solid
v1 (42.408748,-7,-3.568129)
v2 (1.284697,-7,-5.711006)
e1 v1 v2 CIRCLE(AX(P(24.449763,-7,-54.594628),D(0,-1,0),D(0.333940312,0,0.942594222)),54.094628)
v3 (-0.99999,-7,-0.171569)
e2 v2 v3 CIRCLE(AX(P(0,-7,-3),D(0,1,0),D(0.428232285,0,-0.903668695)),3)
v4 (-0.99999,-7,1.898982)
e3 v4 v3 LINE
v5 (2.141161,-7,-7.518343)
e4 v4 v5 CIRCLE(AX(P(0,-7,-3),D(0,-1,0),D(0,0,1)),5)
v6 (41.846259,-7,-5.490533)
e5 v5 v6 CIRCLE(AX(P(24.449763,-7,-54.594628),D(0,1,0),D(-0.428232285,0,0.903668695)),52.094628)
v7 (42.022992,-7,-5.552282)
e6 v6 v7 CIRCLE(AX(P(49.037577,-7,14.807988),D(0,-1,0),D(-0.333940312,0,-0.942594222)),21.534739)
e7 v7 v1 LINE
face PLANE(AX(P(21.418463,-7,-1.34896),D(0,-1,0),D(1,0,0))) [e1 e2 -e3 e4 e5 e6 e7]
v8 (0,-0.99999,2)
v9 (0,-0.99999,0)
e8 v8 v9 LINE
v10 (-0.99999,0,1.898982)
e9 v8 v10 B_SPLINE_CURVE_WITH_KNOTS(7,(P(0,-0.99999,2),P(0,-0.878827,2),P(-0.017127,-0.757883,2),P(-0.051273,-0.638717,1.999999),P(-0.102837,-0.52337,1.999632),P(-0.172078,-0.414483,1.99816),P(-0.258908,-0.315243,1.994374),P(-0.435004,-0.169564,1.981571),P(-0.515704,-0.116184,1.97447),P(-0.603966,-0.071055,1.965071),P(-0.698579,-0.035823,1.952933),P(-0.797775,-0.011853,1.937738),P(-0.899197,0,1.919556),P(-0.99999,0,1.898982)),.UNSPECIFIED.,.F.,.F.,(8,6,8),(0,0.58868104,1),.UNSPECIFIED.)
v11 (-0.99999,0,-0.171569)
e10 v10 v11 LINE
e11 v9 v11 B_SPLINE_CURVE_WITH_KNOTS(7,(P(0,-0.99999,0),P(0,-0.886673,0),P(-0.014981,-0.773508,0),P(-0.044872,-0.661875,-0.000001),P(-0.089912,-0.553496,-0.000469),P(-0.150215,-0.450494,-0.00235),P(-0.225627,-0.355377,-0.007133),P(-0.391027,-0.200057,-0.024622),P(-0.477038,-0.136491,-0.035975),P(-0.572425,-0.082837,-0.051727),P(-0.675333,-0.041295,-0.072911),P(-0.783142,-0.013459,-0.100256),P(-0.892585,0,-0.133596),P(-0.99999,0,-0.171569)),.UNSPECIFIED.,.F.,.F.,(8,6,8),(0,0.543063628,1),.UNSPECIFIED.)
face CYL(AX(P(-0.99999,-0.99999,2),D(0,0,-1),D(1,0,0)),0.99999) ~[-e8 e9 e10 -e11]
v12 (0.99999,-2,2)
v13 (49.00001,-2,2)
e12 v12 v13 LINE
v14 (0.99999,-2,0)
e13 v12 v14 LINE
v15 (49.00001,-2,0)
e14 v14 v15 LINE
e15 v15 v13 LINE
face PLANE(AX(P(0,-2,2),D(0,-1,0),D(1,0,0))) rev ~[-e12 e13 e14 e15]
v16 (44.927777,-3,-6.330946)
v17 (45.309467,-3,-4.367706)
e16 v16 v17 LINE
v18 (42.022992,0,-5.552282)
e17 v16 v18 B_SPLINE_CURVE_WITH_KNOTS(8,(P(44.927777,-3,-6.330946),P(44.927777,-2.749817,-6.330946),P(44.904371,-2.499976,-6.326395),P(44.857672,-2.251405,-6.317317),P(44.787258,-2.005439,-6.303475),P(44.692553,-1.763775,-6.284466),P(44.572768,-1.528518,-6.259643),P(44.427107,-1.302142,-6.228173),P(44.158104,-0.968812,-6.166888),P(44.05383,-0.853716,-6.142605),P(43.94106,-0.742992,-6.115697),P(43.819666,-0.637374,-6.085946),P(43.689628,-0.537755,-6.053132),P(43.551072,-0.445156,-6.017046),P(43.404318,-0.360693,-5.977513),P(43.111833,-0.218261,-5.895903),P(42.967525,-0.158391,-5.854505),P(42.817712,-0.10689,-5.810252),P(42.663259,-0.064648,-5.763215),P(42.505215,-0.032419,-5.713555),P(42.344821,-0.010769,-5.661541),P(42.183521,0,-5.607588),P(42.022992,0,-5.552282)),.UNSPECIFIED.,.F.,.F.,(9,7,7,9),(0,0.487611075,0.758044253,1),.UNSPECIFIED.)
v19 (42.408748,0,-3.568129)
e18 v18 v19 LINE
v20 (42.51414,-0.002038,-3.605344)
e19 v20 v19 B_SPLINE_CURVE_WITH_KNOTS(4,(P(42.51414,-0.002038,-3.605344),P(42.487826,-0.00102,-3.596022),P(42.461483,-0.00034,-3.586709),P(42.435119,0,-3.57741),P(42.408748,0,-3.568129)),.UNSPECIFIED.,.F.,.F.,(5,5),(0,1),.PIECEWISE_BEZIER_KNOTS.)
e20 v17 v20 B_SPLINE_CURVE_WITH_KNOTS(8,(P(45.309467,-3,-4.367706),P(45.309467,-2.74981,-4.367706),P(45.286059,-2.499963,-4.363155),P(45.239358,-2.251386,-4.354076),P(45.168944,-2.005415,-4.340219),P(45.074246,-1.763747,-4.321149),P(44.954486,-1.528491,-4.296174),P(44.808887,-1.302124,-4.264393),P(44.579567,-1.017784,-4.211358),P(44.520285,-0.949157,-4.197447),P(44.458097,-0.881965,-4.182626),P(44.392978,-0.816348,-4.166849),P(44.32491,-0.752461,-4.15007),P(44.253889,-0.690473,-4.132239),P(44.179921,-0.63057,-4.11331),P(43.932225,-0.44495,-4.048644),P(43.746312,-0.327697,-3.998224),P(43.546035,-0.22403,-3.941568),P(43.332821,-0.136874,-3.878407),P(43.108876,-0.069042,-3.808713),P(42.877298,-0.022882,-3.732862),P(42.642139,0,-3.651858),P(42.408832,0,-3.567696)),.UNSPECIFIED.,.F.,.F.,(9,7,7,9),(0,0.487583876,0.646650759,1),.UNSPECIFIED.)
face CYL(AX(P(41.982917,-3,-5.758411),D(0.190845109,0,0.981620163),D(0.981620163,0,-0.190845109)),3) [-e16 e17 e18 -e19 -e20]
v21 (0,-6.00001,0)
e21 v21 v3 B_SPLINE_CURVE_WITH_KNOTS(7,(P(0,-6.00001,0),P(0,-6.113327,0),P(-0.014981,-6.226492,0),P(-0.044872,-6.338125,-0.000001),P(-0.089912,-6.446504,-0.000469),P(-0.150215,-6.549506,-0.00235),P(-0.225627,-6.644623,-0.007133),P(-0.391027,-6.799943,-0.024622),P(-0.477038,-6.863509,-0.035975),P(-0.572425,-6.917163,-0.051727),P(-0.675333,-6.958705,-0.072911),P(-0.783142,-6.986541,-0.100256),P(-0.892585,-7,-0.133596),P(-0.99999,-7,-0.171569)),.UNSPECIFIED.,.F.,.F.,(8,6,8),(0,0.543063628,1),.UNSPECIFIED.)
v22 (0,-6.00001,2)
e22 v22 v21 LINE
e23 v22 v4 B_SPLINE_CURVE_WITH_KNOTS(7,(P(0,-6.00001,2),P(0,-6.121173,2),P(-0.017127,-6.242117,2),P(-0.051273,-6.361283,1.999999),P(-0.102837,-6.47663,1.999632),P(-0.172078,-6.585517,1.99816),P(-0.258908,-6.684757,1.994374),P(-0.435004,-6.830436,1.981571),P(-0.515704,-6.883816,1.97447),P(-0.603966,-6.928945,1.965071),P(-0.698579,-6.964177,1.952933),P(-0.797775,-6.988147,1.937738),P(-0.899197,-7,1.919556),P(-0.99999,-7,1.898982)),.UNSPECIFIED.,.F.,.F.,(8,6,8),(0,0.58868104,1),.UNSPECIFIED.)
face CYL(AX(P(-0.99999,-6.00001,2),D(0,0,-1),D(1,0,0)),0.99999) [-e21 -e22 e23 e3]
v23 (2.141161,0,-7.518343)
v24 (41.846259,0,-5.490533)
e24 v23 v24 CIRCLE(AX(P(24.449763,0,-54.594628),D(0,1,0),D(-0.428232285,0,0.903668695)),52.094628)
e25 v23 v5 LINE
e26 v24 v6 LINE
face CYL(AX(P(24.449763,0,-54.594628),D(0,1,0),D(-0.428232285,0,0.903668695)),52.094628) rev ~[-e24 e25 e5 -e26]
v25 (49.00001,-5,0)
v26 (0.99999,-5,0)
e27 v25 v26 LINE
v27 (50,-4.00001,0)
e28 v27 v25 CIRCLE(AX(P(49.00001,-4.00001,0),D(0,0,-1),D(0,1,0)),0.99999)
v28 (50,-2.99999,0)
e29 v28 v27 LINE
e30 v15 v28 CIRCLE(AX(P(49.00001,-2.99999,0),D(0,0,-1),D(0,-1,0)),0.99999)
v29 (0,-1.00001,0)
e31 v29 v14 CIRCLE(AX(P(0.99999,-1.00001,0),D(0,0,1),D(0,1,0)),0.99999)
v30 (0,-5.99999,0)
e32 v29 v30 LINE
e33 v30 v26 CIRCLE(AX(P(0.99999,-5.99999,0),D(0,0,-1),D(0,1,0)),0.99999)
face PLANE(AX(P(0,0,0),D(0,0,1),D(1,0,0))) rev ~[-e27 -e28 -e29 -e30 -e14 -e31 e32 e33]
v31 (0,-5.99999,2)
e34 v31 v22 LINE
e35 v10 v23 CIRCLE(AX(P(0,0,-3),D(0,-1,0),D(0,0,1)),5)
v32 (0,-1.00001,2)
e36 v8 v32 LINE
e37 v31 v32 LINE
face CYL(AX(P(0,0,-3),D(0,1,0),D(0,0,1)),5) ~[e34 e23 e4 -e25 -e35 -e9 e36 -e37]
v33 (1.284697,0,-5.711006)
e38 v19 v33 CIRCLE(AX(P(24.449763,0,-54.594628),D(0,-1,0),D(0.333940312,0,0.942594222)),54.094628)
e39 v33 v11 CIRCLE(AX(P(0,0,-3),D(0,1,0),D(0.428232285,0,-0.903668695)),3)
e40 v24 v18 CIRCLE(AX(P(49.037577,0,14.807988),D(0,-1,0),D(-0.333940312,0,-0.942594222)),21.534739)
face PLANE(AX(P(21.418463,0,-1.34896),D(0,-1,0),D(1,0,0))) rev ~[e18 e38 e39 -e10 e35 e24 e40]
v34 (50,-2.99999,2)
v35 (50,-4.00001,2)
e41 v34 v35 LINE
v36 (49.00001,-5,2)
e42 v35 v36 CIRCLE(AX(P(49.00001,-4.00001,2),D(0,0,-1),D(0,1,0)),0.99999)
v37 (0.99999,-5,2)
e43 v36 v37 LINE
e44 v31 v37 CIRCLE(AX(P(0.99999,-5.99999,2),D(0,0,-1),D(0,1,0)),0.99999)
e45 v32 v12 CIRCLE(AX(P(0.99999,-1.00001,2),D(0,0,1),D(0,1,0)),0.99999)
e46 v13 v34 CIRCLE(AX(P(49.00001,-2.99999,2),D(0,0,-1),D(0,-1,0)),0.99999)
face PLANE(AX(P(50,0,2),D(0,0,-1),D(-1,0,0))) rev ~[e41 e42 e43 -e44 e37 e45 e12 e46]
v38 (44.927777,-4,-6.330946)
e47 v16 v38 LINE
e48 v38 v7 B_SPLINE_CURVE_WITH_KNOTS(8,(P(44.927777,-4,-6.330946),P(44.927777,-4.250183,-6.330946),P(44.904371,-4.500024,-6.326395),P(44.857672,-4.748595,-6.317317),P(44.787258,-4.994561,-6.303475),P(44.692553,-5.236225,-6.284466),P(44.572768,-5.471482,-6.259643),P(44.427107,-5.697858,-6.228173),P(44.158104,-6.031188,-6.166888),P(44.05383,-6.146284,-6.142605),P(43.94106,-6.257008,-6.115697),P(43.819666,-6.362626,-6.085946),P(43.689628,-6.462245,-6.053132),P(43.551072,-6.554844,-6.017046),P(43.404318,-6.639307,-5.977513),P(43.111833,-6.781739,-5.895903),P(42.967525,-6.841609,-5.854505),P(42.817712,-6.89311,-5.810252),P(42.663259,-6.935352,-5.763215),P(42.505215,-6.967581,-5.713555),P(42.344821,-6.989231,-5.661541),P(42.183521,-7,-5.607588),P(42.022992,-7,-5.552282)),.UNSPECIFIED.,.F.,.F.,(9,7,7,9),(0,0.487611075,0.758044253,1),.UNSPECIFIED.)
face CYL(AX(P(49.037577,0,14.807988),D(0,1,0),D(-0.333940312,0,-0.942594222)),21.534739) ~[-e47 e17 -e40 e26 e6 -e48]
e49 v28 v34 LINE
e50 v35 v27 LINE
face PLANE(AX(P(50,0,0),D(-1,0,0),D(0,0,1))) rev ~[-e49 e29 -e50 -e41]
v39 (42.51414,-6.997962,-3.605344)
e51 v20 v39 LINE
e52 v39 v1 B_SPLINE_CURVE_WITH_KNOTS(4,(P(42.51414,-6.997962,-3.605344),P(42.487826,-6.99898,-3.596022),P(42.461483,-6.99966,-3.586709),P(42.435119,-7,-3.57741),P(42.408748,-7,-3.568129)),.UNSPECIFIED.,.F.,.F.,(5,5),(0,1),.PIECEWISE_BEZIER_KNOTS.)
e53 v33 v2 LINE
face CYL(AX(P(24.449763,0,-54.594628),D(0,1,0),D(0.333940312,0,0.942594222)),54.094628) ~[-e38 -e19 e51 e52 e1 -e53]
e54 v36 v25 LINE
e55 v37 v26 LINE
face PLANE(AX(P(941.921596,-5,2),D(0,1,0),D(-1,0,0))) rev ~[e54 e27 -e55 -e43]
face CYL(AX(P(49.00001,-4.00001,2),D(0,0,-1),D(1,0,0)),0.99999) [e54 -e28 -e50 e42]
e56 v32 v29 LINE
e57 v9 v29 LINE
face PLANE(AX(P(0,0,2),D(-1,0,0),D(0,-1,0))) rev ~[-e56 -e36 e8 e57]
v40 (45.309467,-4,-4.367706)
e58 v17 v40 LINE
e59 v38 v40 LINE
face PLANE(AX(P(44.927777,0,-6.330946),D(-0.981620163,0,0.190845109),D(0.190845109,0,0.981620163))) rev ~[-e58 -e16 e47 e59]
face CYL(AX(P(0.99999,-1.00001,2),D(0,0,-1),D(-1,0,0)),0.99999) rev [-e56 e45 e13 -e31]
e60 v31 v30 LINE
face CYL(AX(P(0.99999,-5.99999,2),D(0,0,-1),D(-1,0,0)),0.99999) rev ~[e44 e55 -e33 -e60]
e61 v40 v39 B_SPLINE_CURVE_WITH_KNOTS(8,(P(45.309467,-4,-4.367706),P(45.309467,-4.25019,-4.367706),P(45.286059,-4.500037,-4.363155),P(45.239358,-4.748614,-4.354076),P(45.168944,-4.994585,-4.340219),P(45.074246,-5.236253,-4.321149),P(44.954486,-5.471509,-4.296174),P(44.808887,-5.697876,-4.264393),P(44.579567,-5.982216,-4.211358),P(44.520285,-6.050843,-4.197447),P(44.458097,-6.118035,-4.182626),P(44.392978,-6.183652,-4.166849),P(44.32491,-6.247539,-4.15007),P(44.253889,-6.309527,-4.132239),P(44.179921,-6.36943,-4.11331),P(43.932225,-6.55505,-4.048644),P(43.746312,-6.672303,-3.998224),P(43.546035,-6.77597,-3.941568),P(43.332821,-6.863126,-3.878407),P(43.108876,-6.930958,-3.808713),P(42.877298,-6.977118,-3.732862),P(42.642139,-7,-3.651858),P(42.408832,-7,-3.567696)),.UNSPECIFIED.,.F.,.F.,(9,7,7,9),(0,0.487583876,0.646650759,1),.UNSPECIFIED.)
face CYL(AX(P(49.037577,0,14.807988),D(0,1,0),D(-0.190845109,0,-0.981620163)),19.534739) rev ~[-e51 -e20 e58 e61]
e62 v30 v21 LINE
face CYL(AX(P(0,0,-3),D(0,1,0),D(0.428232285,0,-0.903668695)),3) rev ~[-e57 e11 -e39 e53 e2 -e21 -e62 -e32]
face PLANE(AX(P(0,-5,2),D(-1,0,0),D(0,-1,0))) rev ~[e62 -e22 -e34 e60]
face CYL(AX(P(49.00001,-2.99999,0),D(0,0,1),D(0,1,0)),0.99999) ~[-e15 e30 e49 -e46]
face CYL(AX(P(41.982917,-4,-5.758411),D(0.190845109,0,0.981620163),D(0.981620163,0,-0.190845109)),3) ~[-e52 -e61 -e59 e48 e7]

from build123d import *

# Parameters (mm, degrees)
F1_DEPTH = 7
F4_DEPTH = 2
F5_R     = 0.99999
F6_R     = 3


# Not quite as in the source:
# - a fillet or chamfer is up to 0.001 mm smaller than in the source, because OpenCascade refuses the exact size


with BuildPart() as f1:
    # F0 (on Front) → F1 (new body)
    with BuildSketch(Plane.XZ):
        with BuildLine():
            ThreePointArc((1.2846968546, -5.7110060848), (-2.9268599432, -3.6584002375), (0, 0))
            Line((0, 0), (50, 0))
            Line((50, 0), (50, 2))
            Line((50, 2), (0, 2))
            ThreePointArc((0, 2), (-4.8780999054, -4.0973337292), (2.1411614243, -7.5183434747))
            ThreePointArc((2.1411614243, -7.5183434747), (21.7926594555, -2.5678073417), (41.8462591278, -5.4905326207))
            ThreePointArc((41.8462591278, -5.4905326207), (43.3714151553, -5.9679500269), (44.9277769901, -6.3309460698))
            Line((44.9277769901, -6.3309460698), (45.3094672073, -4.3677057436))
            ThreePointArc((45.3094672073, -4.3677057436), (43.8976496677, -4.0384223028), (42.5141397524, -3.6053441762))
            ThreePointArc((42.5141397524, -3.6053441762), (21.6906488053, -0.5704105791), (1.2846968546, -5.7110060848))
        make_face()
    extrude(amount=F1_DEPTH)

    # F3 (on face) → F4 (cut)
    with BuildSketch(Plane.XY.offset(2)):
        Polygon((0, -2), (941.9215958638, -2), (50, 0), (0, 0), align=None)
        Polygon((941.9215958638, -5), (0, -5), (0, -7), (0.1395036115, -8.5481454325), (941.9215958638, -6.9726880672), align=None)
    extrude(amount=-F4_DEPTH, mode=Mode.SUBTRACT)

    # F5 (radius 1 in the source; OpenCascade refuses exactly that, so slightly less here)
    f5_edges = [f1.edges().sort_by_distance(p)[0] for p in [
        (0, 0, 1),
        (0, -5, 1),
        (50, -5, 1),
        (50, -2, 1),
        (0, -7, 1),
        (0, -2, 1),
    ]]
    fillet(f5_edges, radius=F5_R)

    # F6
    f6_edges = [f1.edges().sort_by_distance(p)[0] for p in [
        (45.118622, -7, -5.349326),
        (45.118622, 0, -5.349326),
    ]]
    fillet(f6_edges, radius=F6_R)


solid = f1.part
